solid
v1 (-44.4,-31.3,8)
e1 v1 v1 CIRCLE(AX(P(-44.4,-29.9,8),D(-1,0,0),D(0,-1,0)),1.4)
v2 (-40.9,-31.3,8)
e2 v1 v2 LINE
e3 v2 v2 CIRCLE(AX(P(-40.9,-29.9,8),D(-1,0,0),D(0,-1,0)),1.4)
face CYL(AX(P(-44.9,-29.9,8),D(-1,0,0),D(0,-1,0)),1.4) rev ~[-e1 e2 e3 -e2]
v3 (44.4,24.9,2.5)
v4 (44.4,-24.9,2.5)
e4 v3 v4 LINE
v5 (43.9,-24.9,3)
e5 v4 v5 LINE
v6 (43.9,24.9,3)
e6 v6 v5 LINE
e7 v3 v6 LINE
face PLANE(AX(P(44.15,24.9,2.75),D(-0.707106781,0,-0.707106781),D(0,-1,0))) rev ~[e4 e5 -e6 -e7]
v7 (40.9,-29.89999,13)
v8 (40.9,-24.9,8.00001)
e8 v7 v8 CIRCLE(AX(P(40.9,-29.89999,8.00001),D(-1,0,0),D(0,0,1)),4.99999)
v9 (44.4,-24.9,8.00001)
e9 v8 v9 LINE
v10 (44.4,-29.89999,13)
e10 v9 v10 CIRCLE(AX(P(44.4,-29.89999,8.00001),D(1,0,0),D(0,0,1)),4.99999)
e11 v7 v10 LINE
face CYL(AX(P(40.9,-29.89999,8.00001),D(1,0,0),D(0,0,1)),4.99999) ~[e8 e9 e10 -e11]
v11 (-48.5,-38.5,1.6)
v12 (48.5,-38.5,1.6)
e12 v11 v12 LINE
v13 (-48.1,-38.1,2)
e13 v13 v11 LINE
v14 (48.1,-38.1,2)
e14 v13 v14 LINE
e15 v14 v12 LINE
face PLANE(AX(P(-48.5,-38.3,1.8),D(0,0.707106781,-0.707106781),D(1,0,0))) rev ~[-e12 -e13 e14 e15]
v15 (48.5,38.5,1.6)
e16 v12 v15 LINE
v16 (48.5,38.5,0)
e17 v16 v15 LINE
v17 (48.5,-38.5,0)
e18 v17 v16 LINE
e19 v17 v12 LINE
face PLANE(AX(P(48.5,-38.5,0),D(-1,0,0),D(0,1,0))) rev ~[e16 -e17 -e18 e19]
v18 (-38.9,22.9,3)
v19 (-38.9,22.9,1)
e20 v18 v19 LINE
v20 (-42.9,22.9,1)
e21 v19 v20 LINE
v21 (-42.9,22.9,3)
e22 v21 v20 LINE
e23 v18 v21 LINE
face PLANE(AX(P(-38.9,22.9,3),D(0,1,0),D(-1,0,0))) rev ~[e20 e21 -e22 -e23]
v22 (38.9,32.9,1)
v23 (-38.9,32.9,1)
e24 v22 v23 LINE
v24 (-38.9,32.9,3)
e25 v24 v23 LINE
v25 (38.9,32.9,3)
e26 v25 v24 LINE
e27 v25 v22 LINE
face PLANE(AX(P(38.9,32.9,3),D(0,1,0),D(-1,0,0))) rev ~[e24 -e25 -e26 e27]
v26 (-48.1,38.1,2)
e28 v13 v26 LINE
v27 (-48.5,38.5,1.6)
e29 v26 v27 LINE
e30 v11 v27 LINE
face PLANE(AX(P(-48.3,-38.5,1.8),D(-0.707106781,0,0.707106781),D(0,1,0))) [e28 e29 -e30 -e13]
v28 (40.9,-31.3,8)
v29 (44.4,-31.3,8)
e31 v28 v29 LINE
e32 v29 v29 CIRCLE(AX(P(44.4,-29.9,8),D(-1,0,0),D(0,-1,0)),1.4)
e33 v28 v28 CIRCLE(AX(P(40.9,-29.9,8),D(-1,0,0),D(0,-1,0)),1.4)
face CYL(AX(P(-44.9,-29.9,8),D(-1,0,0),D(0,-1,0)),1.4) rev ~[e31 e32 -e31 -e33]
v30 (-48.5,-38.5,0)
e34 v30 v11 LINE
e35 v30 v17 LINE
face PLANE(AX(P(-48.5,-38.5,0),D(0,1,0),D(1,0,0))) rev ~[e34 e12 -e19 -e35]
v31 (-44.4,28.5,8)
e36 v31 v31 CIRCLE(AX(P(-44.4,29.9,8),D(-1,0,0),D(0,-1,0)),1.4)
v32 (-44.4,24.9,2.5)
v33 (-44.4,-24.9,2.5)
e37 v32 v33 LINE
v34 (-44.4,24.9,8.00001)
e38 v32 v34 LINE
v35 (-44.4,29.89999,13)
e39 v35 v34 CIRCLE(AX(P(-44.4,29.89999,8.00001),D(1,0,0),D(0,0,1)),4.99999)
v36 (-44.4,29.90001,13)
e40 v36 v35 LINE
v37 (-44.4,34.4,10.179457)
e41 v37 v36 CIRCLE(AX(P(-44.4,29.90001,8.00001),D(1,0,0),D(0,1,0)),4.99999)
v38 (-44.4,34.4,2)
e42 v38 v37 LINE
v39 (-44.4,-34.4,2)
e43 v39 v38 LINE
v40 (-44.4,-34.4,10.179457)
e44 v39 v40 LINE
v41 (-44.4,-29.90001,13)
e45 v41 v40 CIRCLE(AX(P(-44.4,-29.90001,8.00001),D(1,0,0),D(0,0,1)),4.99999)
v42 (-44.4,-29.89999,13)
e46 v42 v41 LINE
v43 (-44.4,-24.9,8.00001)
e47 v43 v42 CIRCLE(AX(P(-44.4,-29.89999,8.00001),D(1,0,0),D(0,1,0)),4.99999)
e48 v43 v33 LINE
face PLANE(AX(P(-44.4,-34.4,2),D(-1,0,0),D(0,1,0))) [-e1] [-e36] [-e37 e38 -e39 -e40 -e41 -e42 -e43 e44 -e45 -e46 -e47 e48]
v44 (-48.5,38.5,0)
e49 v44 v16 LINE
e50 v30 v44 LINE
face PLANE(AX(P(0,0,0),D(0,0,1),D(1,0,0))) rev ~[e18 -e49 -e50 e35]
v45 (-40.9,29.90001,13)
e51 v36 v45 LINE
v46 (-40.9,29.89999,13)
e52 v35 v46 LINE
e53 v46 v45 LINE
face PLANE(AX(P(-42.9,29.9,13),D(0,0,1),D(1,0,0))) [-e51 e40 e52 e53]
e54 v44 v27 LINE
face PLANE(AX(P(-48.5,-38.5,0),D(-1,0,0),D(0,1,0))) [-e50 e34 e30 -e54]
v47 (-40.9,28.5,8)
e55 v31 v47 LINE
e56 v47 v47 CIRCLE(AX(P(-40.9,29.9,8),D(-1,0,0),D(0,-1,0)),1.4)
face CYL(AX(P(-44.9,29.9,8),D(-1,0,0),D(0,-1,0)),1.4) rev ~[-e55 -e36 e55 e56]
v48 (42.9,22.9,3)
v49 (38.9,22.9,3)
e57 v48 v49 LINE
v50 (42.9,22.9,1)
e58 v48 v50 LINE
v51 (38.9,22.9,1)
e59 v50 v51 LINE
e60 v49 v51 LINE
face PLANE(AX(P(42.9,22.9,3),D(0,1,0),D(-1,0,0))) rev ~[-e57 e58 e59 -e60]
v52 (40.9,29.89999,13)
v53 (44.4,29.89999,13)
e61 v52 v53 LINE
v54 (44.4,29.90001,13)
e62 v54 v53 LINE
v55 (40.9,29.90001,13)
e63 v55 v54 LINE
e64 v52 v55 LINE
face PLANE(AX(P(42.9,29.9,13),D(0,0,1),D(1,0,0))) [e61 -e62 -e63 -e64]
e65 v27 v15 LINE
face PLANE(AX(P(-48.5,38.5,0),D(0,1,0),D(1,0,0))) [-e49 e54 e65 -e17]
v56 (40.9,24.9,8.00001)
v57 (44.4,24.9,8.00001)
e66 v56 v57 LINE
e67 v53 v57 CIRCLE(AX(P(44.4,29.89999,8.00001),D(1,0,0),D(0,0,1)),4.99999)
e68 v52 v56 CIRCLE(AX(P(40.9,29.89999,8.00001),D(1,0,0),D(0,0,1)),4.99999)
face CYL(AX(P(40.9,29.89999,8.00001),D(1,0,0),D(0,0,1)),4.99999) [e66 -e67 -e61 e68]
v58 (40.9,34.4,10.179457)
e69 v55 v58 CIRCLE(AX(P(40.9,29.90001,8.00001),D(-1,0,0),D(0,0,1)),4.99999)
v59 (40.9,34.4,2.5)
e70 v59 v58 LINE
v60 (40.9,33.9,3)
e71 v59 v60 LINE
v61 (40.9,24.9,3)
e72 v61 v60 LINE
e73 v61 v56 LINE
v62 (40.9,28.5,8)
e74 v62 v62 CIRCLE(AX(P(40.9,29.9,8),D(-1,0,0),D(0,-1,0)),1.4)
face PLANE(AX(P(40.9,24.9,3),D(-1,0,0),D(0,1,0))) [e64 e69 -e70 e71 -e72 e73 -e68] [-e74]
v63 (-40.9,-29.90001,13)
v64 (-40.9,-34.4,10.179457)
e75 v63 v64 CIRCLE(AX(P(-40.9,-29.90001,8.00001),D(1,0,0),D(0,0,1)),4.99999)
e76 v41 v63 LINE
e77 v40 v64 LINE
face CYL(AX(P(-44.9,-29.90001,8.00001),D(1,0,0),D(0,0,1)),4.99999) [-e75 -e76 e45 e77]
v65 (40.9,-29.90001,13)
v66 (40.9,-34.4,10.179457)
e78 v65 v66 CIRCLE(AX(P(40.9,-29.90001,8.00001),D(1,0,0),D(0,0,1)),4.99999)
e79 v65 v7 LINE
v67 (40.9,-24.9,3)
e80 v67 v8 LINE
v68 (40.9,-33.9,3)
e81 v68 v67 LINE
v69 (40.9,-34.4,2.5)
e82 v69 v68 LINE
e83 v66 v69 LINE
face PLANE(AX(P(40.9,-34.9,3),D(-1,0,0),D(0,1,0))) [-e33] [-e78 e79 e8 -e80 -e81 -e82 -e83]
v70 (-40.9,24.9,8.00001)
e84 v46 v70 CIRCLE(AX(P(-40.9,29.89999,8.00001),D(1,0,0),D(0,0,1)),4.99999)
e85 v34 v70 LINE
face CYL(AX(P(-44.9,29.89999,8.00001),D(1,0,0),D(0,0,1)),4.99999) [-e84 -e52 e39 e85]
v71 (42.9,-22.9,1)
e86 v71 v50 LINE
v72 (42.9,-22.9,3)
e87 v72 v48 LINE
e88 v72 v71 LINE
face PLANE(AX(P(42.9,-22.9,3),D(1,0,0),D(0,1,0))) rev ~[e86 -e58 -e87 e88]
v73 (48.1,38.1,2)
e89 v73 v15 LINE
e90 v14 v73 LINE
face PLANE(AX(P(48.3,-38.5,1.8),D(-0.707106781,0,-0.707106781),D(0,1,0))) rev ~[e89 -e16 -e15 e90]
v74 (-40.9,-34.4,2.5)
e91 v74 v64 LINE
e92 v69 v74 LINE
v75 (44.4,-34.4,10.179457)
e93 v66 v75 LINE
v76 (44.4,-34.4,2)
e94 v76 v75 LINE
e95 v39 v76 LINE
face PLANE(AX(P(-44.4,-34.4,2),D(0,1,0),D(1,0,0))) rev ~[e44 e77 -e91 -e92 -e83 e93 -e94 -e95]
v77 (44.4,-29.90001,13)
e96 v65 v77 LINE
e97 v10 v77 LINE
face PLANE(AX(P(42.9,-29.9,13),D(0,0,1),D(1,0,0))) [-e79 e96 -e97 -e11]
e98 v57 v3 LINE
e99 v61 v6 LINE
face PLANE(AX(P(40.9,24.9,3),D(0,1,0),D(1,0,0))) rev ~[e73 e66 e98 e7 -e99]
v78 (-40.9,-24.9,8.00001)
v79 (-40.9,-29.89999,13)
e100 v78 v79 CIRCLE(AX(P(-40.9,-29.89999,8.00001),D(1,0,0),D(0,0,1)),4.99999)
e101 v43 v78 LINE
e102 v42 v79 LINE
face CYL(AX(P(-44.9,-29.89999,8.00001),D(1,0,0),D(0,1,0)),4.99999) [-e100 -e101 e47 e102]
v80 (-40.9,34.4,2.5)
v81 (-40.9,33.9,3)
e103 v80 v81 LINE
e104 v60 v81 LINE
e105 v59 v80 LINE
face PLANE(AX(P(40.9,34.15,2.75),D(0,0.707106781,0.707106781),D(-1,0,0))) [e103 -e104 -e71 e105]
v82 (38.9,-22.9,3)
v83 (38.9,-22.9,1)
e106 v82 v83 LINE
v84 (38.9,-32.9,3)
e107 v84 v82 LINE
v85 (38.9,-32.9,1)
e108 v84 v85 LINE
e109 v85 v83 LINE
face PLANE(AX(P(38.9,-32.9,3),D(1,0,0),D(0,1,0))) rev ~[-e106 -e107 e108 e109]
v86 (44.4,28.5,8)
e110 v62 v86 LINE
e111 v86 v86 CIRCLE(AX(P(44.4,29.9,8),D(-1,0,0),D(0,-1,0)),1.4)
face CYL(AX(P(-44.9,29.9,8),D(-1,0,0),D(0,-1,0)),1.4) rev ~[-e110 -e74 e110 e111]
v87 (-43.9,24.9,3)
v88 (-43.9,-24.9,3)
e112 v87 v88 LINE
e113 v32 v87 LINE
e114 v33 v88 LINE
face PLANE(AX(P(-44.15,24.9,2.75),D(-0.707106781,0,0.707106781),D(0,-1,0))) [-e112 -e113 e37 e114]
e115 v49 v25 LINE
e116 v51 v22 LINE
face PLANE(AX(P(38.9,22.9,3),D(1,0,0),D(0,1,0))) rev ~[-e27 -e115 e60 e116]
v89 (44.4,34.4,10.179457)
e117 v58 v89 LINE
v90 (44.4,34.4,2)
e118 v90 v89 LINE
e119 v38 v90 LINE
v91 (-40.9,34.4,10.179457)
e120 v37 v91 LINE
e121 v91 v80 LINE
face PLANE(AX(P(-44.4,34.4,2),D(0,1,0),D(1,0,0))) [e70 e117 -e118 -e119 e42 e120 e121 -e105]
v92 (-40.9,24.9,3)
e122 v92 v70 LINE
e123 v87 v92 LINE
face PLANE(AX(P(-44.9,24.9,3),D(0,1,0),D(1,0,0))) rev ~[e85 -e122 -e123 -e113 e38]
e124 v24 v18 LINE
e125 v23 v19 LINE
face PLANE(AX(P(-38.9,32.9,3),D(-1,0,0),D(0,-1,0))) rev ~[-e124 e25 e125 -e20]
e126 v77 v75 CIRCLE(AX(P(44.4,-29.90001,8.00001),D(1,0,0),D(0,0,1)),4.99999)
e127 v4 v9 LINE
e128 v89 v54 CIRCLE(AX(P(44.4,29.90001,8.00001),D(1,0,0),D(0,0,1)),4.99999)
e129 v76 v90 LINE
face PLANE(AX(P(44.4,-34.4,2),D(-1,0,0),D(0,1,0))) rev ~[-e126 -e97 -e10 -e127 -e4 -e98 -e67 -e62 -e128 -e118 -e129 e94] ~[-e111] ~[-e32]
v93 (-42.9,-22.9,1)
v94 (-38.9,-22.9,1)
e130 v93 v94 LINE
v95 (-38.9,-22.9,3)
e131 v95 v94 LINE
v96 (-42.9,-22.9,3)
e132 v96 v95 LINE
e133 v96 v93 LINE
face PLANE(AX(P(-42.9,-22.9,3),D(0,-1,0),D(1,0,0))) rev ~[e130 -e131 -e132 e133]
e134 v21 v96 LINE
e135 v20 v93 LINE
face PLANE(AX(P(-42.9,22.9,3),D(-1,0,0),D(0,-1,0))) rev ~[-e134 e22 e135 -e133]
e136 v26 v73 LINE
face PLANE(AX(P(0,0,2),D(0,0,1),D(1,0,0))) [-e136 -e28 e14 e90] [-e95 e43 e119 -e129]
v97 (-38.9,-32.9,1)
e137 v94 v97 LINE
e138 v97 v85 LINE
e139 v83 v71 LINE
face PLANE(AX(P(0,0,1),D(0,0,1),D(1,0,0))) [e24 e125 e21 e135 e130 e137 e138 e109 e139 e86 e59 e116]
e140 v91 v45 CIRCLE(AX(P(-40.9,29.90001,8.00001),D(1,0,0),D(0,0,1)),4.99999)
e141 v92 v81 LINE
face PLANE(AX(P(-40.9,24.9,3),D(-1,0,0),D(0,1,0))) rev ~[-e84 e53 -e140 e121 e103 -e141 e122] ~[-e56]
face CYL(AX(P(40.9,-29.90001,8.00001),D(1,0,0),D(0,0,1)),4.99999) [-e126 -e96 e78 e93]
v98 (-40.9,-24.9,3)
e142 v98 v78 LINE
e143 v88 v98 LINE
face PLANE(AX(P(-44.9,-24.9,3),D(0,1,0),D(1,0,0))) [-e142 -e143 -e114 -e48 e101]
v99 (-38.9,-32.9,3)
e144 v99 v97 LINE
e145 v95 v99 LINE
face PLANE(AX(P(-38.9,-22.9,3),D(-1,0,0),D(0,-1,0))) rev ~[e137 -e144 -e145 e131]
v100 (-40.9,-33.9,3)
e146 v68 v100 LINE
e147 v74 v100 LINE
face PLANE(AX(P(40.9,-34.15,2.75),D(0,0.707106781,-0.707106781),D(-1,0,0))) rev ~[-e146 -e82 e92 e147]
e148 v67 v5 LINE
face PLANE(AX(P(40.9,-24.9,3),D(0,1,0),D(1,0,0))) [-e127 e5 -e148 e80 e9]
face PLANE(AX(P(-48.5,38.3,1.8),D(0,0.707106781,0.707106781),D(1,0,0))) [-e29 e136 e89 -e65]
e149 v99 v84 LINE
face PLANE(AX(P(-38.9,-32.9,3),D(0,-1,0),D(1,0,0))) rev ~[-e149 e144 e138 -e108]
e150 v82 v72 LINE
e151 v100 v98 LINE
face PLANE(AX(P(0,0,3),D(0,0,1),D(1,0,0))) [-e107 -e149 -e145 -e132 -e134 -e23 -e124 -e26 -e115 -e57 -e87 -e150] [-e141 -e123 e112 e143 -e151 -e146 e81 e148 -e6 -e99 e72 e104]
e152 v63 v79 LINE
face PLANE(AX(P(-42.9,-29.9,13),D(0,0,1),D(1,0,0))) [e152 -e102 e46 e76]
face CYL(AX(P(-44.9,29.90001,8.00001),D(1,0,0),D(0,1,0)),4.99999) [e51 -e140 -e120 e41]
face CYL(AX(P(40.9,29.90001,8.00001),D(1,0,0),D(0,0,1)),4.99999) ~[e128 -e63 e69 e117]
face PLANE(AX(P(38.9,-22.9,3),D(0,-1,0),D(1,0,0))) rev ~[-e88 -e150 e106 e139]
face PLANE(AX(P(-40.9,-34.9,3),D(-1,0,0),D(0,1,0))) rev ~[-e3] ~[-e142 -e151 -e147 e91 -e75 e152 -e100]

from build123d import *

# Parameters (mm, degrees)
F0_W      = 97
F0_H      = 77
F1_DEPTH  = 2
F2_W      = 89.8
F2_H      = 69.8
F3_DEPTH  = 1
F4_W      = 4
F4_H      = 10
F5_DEPTH  = 10
F6_R      = 4.99999
F7_R      = 1.4
F8_DEPTH  = 93.401
F10_DEPTH = 2
F11_W     = 97
F11_H     = 77
F11_W_2   = 88.8
F11_H_2   = 68.8
F12_DEPTH = 11.001
F13_SIZE  = 0.5
F14_SIZE  = 0.4


# Not quite as in the source:
# - a fillet or chamfer is up to 0.001 mm smaller than in the source, because OpenCascade refuses the exact size


with BuildPart() as f1:
    # F0 (on Top) → F1 (new body)
    with BuildSketch(Plane.XY):
        Rectangle(F0_W, F0_H)
    extrude(amount=F1_DEPTH)

    # F2 (on face) → F3 (join)
    with BuildSketch(Plane.XY.offset(2)):
        Rectangle(F2_W, F2_H)
    extrude(amount=F3_DEPTH)

    # F4 (on face) → F5 (join)
    with BuildSketch(Plane.XY.offset(3)):
        with Locations((-42.9, 29.9)):
            Rectangle(F4_W, F4_H)
        with Locations((42.9, 29.9)):
            Rectangle(F4_W, F4_H)
        with Locations((-42.9, -29.9)):
            Rectangle(F4_W, F4_H)
        with Locations((42.9, -29.9)):
            Rectangle(F4_W, F4_H)
    extrude(amount=F5_DEPTH)

    # F6 (radius 5 in the source; OpenCascade refuses exactly that, so slightly less here)
    f6_edges = [f1.edges().sort_by_distance(p)[0] for p in [
        (42.9, 34.9, 13),
        (42.9, 24.9, 13),
        (42.9, -24.9, 13),
        (42.9, -34.9, 13),
        (-42.9, -24.9, 13),
        (-42.9, -34.9, 13),
        (-42.9, 34.9, 13),
        (-42.9, 24.9, 13),
    ]]
    fillet(f6_edges, radius=F6_R)

    # F7 (on face) → F8 (cut, through all)
    with BuildSketch(Plane(origin=(-44.9, 0, 0), x_dir=(0, -1, 0), z_dir=(-1, 0, 0))):
        with Locations((-29.9, 8)):
            Circle(F7_R)
        with Locations((29.9, 8)):
            Circle(F7_R)
    extrude(amount=-F8_DEPTH, mode=Mode.SUBTRACT)

    # F9 (on face) → F10 (cut)
    with BuildSketch(Plane.XY.offset(3)):
        Polygon((-42.9, -22.9), (-38.9, -22.9), (-38.9, -32.9), (38.9, -32.9), (38.9, -22.9), (42.9, -22.9), (42.9, 22.9), (38.9, 22.9), (38.9, 32.9), (-38.9, 32.9), (-38.9, 22.9), (-42.9, 22.9), align=None)
    extrude(amount=-F10_DEPTH, mode=Mode.SUBTRACT)

    # F11 (on face) → F12 (cut, through all)
    with BuildSketch(Plane.XY.offset(2)):
        Rectangle(F11_W, F11_H)
        Rectangle(F11_W_2, F11_H_2, mode=Mode.SUBTRACT)
    extrude(amount=F12_DEPTH, mode=Mode.SUBTRACT)

    # F13
    f13_edges = [f1.edges().sort_by_distance(p)[0] for p in [
        (44.4, 0, 3),
        (0, -34.4, 3),
        (-44.4, 0, 3),
        (0, 34.4, 3),
    ]]
    chamfer(f13_edges, length=F13_SIZE)

    # F14
    f14_edges = [f1.edges().sort_by_distance(p)[0] for p in [
        (-48.5, 0, 2),
        (0, 38.5, 2),
        (48.5, 0, 2),
        (0, -38.5, 2),
    ]]
    chamfer(f14_edges, length=F14_SIZE)


solid = f1.part
